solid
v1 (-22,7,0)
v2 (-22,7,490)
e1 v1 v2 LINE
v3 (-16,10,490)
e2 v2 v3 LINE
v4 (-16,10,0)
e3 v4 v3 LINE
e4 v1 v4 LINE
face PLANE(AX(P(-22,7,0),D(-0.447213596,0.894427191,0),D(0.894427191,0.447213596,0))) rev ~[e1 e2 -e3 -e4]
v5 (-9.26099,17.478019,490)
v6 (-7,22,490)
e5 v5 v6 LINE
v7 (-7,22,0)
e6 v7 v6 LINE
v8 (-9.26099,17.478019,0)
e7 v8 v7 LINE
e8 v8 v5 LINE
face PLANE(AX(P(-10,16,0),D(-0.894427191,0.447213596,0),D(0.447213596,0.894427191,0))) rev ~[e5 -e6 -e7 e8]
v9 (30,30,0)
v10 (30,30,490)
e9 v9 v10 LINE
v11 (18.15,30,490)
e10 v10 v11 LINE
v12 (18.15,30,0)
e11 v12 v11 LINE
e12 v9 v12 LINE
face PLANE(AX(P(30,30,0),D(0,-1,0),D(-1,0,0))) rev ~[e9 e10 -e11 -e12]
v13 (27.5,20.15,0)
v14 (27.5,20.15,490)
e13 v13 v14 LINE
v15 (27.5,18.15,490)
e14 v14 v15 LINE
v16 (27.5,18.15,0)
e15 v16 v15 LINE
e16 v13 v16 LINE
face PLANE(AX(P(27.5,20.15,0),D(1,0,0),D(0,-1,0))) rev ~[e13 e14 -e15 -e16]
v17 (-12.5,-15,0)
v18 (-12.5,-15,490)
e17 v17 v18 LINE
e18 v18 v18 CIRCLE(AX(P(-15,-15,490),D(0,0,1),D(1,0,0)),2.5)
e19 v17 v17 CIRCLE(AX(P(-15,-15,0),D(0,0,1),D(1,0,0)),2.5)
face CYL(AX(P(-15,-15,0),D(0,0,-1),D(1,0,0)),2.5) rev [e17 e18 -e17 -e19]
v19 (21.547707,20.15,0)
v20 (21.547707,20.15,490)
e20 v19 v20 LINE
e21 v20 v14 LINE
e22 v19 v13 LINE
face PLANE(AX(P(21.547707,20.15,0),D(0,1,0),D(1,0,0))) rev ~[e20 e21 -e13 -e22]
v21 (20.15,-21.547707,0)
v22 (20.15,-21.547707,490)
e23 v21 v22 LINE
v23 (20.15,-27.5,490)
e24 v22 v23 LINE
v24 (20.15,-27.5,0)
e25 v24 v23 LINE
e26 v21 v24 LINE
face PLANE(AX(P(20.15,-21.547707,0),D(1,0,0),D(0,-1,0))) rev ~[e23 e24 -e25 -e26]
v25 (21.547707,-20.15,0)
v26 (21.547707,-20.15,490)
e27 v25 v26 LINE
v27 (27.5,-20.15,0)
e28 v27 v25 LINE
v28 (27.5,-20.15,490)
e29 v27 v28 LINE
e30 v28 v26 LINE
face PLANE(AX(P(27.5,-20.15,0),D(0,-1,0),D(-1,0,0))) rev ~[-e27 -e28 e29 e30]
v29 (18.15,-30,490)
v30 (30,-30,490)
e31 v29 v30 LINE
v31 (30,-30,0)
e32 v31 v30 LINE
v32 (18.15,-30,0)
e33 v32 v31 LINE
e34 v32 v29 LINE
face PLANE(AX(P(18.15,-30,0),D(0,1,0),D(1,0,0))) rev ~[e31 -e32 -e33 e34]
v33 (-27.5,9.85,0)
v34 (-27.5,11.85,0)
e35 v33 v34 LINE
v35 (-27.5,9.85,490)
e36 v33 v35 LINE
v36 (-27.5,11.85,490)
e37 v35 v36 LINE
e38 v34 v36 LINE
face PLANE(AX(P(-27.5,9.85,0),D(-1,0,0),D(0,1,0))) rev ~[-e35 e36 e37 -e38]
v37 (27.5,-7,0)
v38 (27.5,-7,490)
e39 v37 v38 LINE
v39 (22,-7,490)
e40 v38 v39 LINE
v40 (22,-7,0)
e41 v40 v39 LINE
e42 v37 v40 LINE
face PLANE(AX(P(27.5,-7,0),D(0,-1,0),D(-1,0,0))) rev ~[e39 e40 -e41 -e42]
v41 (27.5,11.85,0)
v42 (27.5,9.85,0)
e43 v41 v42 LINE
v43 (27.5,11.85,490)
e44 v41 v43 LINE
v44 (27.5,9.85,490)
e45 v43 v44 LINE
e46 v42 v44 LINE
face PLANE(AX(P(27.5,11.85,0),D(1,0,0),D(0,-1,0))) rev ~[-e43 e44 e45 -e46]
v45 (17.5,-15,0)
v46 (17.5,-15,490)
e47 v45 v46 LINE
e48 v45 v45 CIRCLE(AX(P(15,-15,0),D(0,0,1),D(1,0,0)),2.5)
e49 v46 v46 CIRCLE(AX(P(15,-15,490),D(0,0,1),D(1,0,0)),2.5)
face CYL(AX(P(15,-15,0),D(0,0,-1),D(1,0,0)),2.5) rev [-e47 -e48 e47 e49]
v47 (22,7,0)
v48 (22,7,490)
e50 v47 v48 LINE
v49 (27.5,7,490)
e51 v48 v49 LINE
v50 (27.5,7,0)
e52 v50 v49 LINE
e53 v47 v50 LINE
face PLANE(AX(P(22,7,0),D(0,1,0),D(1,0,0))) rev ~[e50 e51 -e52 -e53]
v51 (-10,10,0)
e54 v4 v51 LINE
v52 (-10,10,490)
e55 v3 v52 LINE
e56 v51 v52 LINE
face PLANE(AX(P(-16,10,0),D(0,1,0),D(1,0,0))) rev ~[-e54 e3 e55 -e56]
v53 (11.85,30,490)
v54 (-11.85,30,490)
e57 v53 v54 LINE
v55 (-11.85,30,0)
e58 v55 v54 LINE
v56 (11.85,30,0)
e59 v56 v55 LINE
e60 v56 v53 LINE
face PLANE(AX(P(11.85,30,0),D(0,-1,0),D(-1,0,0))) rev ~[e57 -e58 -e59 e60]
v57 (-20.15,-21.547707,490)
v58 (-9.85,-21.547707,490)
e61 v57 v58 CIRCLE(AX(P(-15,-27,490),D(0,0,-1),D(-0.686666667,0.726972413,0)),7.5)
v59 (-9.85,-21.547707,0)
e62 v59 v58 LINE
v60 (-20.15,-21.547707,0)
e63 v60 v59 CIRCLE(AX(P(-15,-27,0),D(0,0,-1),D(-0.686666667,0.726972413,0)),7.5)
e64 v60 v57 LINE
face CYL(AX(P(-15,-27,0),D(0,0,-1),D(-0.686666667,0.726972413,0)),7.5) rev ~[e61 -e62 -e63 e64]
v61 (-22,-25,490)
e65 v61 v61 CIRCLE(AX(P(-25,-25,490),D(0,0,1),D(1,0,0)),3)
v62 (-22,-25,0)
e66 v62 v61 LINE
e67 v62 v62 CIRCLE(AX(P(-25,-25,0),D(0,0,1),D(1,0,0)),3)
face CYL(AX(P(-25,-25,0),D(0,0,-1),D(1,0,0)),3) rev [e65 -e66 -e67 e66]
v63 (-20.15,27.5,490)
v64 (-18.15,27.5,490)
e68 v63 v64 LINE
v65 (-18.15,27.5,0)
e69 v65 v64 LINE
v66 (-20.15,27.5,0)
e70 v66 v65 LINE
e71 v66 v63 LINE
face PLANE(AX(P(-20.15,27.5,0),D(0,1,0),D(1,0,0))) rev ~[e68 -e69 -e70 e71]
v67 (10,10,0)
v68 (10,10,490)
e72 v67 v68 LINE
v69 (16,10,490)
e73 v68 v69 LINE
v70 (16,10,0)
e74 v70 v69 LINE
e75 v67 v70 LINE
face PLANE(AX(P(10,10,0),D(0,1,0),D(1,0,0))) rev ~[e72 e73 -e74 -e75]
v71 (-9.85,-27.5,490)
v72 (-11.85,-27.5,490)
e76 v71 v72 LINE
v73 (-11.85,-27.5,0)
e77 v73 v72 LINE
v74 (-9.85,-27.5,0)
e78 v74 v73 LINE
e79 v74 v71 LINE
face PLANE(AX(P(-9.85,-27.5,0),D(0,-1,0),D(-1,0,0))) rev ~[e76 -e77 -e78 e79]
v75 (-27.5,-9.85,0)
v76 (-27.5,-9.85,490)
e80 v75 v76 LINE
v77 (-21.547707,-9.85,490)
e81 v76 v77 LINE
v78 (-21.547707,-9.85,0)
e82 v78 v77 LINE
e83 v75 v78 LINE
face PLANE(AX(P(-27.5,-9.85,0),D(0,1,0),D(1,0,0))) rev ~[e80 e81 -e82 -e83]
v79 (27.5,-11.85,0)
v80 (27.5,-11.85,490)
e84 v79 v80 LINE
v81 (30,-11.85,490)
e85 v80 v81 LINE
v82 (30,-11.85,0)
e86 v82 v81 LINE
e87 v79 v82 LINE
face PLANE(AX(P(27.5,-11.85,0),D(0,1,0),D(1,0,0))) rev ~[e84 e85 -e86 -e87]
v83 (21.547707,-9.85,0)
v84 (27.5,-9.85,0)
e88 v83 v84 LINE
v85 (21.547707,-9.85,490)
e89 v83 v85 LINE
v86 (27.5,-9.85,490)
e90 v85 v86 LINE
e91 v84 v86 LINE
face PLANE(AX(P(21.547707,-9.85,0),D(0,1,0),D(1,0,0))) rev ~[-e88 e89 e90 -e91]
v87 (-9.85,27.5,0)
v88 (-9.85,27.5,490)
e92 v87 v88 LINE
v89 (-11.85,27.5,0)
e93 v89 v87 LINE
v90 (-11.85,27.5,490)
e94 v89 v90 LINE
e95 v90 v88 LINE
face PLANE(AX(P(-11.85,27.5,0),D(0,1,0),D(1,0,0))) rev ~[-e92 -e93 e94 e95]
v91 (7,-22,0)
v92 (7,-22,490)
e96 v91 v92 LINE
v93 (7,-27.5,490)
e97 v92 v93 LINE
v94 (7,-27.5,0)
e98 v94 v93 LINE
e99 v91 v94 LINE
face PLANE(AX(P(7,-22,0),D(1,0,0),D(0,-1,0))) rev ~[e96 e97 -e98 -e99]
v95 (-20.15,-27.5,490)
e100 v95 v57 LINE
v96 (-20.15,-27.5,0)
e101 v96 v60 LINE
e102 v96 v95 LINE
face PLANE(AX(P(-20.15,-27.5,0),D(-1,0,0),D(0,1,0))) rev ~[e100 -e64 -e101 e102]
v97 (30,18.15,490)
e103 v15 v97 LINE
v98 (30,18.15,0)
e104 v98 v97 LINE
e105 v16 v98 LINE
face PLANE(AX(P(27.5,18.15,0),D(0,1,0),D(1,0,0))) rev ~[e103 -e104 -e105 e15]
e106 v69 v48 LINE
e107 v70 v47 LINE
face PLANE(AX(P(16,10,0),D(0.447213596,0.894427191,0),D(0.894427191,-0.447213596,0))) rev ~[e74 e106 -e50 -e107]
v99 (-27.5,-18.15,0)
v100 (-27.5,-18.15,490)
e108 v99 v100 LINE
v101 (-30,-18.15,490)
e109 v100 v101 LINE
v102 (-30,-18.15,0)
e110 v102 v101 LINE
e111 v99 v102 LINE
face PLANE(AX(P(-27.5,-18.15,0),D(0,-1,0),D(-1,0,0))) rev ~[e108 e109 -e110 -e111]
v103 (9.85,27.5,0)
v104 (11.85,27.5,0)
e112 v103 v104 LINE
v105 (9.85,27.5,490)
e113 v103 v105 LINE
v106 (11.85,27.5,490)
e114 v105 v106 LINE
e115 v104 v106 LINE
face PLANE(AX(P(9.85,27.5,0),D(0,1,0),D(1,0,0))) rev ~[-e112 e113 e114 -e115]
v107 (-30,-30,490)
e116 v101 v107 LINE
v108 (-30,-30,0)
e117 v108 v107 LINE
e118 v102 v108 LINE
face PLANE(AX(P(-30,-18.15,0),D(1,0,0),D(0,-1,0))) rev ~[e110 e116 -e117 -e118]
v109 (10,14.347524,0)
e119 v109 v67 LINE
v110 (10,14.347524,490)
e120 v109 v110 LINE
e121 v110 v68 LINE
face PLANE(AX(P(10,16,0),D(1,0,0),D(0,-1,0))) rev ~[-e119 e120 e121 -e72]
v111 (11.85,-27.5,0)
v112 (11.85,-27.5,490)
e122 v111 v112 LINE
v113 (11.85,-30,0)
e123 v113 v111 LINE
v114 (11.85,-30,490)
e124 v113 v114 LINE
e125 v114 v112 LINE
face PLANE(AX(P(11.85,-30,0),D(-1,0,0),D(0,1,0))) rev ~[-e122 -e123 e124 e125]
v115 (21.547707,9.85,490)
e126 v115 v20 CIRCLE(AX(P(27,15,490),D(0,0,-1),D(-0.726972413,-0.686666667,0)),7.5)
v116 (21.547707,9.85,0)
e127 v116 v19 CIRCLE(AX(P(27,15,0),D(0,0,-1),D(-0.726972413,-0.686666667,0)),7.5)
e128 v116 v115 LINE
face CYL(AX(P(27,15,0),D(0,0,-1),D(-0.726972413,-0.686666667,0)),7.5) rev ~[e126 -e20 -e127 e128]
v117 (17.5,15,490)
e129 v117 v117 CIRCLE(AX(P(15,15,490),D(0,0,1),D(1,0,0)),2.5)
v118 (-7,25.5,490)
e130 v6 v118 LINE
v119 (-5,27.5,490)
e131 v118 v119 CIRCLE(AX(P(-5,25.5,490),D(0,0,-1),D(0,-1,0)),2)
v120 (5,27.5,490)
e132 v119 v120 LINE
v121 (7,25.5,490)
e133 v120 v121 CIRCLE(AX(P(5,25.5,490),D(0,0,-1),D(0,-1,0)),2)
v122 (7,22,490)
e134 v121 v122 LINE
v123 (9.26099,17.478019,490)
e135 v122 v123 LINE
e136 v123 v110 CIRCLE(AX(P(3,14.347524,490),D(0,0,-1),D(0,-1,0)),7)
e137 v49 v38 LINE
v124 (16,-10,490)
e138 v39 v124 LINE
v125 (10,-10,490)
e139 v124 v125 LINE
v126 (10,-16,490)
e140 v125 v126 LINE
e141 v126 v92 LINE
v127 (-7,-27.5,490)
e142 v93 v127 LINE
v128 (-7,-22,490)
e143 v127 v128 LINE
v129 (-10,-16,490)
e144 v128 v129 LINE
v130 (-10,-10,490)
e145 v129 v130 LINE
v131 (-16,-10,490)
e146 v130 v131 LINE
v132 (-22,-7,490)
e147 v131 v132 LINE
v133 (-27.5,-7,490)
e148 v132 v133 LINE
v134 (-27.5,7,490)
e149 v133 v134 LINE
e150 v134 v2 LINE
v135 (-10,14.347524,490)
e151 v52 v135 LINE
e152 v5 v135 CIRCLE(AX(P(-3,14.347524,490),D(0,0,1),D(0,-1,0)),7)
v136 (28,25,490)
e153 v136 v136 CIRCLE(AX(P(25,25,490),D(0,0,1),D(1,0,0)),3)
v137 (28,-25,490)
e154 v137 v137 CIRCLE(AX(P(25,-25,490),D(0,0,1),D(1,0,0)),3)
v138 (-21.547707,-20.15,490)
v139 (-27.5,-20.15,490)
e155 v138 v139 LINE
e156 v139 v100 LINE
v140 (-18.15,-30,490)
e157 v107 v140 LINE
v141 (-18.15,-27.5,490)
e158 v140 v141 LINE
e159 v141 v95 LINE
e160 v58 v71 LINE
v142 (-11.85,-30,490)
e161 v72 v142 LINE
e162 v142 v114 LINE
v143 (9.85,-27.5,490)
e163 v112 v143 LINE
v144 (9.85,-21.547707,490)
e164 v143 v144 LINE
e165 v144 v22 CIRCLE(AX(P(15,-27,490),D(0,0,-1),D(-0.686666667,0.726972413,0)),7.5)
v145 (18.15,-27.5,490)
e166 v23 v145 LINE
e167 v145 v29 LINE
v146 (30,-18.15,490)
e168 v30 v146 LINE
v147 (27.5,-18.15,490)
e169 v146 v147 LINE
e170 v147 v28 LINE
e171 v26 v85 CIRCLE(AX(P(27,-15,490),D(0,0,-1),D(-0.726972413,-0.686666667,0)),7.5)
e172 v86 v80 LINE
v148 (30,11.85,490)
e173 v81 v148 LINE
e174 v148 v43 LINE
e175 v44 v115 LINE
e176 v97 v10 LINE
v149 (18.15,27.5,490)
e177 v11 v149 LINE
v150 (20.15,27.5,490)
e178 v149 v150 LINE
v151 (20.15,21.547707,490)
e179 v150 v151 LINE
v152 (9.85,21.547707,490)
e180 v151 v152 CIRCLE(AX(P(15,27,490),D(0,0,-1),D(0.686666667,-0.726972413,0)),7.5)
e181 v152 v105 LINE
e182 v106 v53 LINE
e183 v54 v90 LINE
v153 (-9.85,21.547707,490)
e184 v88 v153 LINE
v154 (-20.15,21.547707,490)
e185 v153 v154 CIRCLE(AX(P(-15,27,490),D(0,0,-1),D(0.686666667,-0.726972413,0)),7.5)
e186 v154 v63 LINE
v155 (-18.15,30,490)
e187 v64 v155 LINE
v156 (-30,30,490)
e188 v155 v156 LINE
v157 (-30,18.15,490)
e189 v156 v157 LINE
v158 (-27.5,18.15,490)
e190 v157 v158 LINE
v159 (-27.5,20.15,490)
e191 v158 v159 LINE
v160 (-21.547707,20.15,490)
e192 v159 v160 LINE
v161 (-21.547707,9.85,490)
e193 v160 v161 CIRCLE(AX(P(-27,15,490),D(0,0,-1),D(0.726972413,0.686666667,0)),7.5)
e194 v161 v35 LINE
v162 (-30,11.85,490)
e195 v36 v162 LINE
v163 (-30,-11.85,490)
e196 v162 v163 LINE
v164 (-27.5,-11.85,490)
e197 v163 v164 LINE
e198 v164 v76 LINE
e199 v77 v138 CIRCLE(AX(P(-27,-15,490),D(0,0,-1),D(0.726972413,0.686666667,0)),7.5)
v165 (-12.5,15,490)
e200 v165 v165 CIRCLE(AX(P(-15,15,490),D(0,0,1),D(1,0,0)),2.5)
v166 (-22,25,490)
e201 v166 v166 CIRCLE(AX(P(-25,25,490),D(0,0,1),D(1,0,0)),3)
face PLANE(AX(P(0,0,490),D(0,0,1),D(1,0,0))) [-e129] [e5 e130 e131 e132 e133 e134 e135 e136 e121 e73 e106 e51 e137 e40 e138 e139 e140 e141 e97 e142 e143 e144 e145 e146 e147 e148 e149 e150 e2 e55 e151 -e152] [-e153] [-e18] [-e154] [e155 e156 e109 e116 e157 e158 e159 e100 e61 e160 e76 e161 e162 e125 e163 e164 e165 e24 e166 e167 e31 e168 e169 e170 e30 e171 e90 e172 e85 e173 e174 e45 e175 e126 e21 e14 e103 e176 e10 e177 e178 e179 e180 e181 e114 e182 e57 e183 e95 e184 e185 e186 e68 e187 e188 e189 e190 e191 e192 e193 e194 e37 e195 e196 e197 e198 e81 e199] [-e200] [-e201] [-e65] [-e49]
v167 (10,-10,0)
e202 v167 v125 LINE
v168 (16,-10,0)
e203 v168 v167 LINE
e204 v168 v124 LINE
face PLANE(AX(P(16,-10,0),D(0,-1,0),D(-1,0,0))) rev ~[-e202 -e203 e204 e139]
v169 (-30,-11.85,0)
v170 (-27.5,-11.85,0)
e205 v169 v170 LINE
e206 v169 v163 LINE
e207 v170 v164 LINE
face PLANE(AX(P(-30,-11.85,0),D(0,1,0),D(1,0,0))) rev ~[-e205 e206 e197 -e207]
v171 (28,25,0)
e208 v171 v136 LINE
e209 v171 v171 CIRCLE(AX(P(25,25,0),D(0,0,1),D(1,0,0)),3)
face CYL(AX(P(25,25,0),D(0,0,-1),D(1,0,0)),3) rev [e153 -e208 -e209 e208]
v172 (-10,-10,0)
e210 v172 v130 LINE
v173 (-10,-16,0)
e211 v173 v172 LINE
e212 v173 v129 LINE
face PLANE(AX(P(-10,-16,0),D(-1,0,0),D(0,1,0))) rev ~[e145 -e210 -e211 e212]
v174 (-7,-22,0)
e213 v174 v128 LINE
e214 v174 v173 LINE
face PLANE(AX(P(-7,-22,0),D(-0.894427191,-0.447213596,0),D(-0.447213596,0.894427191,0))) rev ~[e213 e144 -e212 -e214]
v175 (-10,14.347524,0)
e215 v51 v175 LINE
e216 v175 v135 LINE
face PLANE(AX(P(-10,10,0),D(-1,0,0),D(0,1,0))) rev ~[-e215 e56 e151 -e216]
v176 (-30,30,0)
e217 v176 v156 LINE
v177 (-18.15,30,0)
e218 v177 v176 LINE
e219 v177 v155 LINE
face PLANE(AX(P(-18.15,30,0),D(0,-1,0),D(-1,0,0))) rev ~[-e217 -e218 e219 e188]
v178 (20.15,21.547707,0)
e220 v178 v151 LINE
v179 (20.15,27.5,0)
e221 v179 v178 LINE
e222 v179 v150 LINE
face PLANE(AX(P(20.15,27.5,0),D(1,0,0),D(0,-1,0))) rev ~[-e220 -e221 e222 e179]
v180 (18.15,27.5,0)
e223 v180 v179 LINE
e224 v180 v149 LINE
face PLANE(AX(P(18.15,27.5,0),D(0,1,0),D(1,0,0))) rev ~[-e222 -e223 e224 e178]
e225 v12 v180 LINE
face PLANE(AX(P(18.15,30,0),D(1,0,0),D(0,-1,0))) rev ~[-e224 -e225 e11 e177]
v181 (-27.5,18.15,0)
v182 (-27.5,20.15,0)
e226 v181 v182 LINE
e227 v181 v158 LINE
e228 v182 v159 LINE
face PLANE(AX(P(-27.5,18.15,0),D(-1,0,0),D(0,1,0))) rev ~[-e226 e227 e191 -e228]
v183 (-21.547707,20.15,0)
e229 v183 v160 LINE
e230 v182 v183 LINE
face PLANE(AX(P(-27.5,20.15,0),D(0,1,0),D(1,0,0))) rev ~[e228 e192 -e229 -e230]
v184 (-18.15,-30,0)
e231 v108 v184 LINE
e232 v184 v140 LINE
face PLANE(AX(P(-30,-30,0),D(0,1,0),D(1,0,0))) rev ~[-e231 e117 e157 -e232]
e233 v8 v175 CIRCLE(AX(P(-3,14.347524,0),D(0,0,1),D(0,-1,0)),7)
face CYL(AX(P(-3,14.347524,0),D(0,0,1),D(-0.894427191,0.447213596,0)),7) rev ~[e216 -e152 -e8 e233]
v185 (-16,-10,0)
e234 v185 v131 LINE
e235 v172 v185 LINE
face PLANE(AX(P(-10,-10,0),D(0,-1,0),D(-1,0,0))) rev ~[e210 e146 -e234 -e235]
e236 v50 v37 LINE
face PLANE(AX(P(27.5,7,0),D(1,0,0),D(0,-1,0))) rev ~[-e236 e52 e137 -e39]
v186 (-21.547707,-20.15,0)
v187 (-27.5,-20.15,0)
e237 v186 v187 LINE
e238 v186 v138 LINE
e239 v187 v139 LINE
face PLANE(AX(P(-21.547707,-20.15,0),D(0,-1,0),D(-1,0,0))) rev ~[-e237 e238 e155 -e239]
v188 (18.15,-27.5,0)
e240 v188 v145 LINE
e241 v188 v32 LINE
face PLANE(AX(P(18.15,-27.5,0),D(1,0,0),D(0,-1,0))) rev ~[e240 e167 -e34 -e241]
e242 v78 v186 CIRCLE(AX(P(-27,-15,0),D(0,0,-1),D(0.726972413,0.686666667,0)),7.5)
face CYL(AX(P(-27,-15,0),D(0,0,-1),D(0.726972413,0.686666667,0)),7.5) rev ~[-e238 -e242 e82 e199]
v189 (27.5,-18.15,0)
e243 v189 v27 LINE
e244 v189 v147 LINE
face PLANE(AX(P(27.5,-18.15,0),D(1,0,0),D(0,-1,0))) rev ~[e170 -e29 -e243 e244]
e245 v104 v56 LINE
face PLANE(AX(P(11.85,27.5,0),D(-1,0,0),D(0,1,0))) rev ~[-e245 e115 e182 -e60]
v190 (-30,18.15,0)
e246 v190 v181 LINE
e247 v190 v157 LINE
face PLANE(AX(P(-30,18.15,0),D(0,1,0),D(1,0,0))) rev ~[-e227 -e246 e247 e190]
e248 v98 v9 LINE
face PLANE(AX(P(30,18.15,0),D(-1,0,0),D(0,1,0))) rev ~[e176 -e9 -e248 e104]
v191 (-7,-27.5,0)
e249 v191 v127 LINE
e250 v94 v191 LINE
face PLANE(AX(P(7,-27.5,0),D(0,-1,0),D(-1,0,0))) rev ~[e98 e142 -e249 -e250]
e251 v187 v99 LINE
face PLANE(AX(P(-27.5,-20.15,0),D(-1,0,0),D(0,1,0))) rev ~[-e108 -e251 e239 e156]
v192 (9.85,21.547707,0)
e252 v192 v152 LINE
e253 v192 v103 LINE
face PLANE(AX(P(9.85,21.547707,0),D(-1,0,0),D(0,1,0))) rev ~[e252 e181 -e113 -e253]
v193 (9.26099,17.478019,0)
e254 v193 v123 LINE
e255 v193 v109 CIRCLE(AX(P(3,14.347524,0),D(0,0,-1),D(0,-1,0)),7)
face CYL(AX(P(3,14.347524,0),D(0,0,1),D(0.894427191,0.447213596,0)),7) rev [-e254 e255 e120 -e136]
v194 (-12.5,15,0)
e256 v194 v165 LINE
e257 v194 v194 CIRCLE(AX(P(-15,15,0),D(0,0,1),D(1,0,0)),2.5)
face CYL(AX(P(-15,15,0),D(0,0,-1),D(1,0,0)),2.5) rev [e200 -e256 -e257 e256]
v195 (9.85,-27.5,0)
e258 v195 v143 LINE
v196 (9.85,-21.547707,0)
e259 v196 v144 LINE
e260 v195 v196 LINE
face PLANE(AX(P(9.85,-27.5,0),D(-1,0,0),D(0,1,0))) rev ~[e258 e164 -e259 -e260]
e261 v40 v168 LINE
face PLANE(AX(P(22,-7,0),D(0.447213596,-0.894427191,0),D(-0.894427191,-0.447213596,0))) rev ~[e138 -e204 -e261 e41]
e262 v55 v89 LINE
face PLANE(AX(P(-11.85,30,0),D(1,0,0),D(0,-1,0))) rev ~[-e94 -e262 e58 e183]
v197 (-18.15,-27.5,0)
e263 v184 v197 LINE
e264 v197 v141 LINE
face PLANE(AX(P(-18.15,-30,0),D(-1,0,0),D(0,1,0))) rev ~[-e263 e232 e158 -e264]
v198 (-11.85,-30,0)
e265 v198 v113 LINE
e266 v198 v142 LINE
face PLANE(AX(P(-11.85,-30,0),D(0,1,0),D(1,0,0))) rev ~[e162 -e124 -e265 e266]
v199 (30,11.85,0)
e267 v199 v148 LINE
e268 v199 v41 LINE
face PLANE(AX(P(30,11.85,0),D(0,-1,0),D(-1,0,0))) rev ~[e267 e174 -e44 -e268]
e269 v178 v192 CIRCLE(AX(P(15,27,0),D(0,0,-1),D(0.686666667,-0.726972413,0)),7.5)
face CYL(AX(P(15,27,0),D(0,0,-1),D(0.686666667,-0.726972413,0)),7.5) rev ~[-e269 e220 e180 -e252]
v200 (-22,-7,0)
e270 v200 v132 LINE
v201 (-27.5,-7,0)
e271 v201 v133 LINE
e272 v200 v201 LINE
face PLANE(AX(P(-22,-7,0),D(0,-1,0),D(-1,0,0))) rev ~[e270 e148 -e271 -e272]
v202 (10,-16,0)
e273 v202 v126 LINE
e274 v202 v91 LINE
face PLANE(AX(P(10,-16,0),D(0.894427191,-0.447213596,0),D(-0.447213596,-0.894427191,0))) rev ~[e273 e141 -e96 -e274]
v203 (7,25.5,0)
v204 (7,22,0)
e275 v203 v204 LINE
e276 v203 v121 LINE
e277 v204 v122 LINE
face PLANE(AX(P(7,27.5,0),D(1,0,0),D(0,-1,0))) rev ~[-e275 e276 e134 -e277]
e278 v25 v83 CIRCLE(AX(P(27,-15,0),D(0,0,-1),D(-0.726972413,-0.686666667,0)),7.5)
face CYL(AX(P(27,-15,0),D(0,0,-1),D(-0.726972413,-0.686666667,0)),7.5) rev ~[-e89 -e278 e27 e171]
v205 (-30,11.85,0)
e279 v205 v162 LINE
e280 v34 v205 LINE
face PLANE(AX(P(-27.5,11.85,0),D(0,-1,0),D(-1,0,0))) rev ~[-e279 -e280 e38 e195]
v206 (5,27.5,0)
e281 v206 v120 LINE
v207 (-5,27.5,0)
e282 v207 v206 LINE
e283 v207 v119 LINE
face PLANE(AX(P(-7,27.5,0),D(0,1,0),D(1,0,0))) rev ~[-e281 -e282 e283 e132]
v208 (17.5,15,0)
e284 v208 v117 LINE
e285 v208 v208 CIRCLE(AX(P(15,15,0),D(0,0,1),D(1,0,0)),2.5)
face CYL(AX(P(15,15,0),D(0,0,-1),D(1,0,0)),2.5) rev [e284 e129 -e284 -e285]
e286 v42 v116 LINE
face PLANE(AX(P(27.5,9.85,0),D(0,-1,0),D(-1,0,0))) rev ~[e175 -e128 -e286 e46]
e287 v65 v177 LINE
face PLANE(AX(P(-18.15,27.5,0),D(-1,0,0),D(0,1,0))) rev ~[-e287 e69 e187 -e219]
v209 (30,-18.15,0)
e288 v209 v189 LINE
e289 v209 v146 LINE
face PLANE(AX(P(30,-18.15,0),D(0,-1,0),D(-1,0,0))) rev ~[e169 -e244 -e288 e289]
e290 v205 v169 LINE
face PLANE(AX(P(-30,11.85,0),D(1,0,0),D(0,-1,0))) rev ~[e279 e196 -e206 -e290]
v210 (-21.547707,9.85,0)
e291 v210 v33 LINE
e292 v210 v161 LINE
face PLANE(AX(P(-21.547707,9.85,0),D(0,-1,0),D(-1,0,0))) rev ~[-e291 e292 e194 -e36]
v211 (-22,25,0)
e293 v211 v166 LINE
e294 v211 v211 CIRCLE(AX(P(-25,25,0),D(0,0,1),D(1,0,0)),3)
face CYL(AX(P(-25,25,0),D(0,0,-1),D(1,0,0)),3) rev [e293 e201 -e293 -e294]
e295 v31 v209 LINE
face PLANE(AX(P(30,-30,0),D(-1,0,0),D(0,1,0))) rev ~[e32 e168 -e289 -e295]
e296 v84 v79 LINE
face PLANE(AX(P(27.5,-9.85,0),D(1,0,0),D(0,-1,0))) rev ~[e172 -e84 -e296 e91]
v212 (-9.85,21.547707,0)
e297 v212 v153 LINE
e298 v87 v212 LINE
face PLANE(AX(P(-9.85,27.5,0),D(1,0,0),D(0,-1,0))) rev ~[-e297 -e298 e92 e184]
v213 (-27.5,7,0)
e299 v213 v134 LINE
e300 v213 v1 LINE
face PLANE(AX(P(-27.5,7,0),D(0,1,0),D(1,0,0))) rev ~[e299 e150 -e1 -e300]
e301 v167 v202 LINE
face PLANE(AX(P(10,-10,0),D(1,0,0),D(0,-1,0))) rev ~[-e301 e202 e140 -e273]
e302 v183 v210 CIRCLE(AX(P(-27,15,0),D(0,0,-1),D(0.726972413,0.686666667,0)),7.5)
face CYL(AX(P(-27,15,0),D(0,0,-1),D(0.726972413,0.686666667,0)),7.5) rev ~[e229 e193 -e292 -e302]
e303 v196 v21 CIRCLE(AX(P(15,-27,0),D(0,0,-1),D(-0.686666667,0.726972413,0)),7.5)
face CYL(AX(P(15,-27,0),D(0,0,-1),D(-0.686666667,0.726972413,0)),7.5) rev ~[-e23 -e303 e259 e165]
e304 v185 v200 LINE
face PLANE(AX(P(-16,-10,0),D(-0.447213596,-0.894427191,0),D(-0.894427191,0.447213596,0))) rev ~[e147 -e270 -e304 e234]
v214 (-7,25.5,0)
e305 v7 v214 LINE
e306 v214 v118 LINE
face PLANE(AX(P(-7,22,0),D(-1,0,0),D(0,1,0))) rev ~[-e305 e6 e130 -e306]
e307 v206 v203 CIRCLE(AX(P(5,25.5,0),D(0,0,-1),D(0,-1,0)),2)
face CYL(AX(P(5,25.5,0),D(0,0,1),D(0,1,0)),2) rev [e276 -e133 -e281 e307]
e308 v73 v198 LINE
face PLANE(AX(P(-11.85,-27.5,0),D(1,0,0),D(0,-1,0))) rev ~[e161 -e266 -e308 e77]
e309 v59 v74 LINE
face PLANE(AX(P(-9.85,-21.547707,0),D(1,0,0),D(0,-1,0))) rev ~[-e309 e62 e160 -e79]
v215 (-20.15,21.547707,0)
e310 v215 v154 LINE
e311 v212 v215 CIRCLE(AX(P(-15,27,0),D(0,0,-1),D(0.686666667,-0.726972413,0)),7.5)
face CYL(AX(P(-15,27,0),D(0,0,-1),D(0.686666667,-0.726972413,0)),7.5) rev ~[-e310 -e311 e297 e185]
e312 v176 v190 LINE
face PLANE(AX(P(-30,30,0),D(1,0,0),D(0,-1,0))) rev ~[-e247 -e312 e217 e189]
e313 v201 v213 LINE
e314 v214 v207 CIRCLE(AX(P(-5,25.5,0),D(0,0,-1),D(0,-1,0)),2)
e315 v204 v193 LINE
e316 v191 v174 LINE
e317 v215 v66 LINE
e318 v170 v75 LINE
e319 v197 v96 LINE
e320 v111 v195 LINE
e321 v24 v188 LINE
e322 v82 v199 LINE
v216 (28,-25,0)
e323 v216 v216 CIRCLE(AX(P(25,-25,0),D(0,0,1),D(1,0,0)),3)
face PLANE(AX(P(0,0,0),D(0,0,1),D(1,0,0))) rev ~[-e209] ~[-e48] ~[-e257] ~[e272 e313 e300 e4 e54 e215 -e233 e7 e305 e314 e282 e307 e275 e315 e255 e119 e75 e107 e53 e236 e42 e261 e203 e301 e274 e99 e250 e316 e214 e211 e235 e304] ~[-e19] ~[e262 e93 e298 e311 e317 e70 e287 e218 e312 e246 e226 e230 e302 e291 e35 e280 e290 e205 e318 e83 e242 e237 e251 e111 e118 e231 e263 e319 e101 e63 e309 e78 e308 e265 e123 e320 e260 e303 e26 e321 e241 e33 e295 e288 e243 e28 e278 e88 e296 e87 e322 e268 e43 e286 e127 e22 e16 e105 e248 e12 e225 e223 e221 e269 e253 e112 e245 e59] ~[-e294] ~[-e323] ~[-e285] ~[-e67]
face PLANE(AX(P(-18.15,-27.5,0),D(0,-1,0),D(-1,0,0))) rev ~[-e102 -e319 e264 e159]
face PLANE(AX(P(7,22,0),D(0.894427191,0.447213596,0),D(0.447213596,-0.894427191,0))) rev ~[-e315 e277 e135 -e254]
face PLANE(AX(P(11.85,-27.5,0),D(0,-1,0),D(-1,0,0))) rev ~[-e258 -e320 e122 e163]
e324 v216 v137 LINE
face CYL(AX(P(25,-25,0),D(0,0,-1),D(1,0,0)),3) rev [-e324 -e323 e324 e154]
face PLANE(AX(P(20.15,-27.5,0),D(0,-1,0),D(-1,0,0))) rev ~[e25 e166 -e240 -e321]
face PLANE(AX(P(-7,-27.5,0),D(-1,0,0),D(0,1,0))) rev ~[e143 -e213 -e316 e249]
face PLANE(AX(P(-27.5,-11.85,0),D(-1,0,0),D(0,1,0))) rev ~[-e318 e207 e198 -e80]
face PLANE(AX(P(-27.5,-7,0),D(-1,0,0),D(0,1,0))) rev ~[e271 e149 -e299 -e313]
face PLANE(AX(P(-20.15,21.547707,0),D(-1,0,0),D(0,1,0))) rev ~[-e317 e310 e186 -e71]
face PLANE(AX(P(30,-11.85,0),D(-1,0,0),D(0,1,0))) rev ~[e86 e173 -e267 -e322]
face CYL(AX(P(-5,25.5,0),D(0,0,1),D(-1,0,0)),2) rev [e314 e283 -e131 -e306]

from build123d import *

# Parameters (mm, degrees)
F0_R     = 3
F0_R_2   = 2.5
F1_DEPTH = 490
F2_R     = 2
F3_R     = 7


# Not quite as in the source:
# - a feature names something its author has since deleted; it is built from what else it names


with BuildPart() as f1:
    # F0 (on Top) → F1 (new body)
    with BuildSketch(Plane.XY):
        with BuildLine():
            Line((18.15, -30), (30, -30))
            Line((30, -30), (30, -18.15))
            Line((30, -18.15), (27.5, -18.15))
            Line((27.5, -18.15), (27.5, -20.15))
            Line((27.5, -20.15), (21.5477069044, -20.15))
            ThreePointArc((21.5477069044, -20.15), (19.5, -15), (21.5477069044, -9.85))
            Line((21.5477069044, -9.85), (27.5, -9.85))
            Line((27.5, -9.85), (27.5, -11.85))
            Line((27.5, -11.85), (30, -11.85))
            Line((30, -11.85), (30, 11.85))
            Line((30, 11.85), (27.5, 11.85))
            Line((27.5, 11.85), (27.5, 9.85))
            Line((27.5, 9.85), (21.5477069044, 9.85))
            ThreePointArc((21.5477069044, 9.85), (19.5, 15), (21.5477069044, 20.15))
            Line((21.5477069044, 20.15), (27.5, 20.15))
            Line((27.5, 20.15), (27.5, 18.15))
            Line((27.5, 18.15), (30, 18.15))
            Line((30, 18.15), (30, 30))
            Line((30, 30), (18.15, 30))
            Line((18.15, 30), (18.15, 27.5))
            Line((18.15, 27.5), (20.15, 27.5))
            Line((20.15, 27.5), (20.15, 21.5477069044))
            ThreePointArc((20.15, 21.5477069044), (15, 19.5), (9.85, 21.5477069044))
            Line((9.85, 21.5477069044), (9.85, 27.5))
            Line((9.85, 27.5), (11.85, 27.5))
            Line((11.85, 27.5), (11.85, 30))
            Line((11.85, 30), (-11.85, 30))
            Line((-11.85, 30), (-11.85, 27.5))
            Line((-11.85, 27.5), (-9.85, 27.5))
            Line((-9.85, 27.5), (-9.85, 21.5477069044))
            ThreePointArc((-9.85, 21.5477069044), (-15, 19.5), (-20.15, 21.5477069044))
            Line((-20.15, 21.5477069044), (-20.15, 27.5))
            Line((-20.15, 27.5), (-18.15, 27.5))
            Line((-18.15, 27.5), (-18.15, 30))
            Line((-18.15, 30), (-30, 30))
            Line((-30, 30), (-30, 18.15))
            Line((-30, 18.15), (-27.5, 18.15))
            Line((-27.5, 18.15), (-27.5, 20.15))
            Line((-27.5, 20.15), (-21.5477069044, 20.15))
            ThreePointArc((-21.5477069044, 20.15), (-19.5, 15), (-21.5477069044, 9.85))
            Line((-21.5477069044, 9.85), (-27.5, 9.85))
            Line((-27.5, 9.85), (-27.5, 11.85))
            Line((-27.5, 11.85), (-30, 11.85))
            Line((-30, 11.85), (-30, -11.85))
            Line((-30, -11.85), (-27.5, -11.85))
            Line((-27.5, -11.85), (-27.5, -9.85))
            Line((-27.5, -9.85), (-21.5477069044, -9.85))
            ThreePointArc((-21.5477069044, -9.85), (-19.5, -15), (-21.5477069044, -20.15))
            Line((-21.5477069044, -20.15), (-27.5, -20.15))
            Line((-27.5, -20.15), (-27.5, -18.15))
            Line((-27.5, -18.15), (-30, -18.15))
            Line((-30, -18.15), (-30, -30))
            Line((-30, -30), (-18.15, -30))
            Line((-18.15, -30), (-18.15, -27.5))
            Line((-18.15, -27.5), (-20.15, -27.5))
            Line((-20.15, -27.5), (-20.15, -21.5477069044))
            ThreePointArc((-20.15, -21.5477069044), (-15, -19.5), (-9.85, -21.5477069044))
            Line((-9.85, -21.5477069044), (-9.85, -27.5))
            Line((-9.85, -27.5), (-11.85, -27.5))
            Line((-11.85, -27.5), (-11.85, -30))
            Line((-11.85, -30), (11.85, -30))
            Line((11.85, -30), (11.85, -27.5))
            Line((11.85, -27.5), (9.85, -27.5))
            Line((9.85, -27.5), (9.85, -21.5477069044))
            ThreePointArc((9.85, -21.5477069044), (15, -19.5), (20.15, -21.5477069044))
            Line((20.15, -21.5477069044), (20.15, -27.5))
            Line((20.15, -27.5), (18.15, -27.5))
            Line((18.15, -27.5), (18.15, -30))
        make_face()
        with Locations((-25, -25)):
            Circle(F0_R, mode=Mode.SUBTRACT)
        with Locations((-15, -15)):
            Circle(F0_R_2, mode=Mode.SUBTRACT)
        with Locations((25, -25)):
            Circle(F0_R, mode=Mode.SUBTRACT)
        with Locations((15, -15)):
            Circle(F0_R_2, mode=Mode.SUBTRACT)
        with Locations((-25, 25)):
            Circle(F0_R, mode=Mode.SUBTRACT)
        with Locations((-15, 15)):
            Circle(F0_R_2, mode=Mode.SUBTRACT)
        Polygon((-7, 22), (-7, 27.5), (0, 27.5), (7, 27.5), (7, 22), (10, 16), (10, 10), (16, 10), (22, 7), (27.5, 7), (27.5, 0), (27.5, -7), (22, -7), (16, -10), (10, -10), (10, -16), (7, -22), (7, -27.5), (0, -27.5), (-7, -27.5), (-7, -22), (-10, -16), (-10, -10), (-16, -10), (-22, -7), (-27.5, -7), (-27.5, 0), (-27.5, 7), (-22, 7), (-16, 10), (-10, 10), (-10, 16), align=None, mode=Mode.SUBTRACT)
        with Locations((15, 15)):
            Circle(F0_R_2, mode=Mode.SUBTRACT)
        with Locations((25, 25)):
            Circle(F0_R, mode=Mode.SUBTRACT)
    extrude(amount=F1_DEPTH)

    # F2
    f2_edges = [f1.edges().sort_by_distance(p)[0] for p in [
        (-7, 27.5, 245),
        (7, 27.5, 245),
    ]]
    fillet(f2_edges, radius=F2_R)

    # F3
    f3_edges = [f1.edges().sort_by_distance(p)[0] for p in [
        (-10, 16, 245),
        (10, 16, 245),
    ]]
    fillet(f3_edges, radius=F3_R)


solid = f1.part
